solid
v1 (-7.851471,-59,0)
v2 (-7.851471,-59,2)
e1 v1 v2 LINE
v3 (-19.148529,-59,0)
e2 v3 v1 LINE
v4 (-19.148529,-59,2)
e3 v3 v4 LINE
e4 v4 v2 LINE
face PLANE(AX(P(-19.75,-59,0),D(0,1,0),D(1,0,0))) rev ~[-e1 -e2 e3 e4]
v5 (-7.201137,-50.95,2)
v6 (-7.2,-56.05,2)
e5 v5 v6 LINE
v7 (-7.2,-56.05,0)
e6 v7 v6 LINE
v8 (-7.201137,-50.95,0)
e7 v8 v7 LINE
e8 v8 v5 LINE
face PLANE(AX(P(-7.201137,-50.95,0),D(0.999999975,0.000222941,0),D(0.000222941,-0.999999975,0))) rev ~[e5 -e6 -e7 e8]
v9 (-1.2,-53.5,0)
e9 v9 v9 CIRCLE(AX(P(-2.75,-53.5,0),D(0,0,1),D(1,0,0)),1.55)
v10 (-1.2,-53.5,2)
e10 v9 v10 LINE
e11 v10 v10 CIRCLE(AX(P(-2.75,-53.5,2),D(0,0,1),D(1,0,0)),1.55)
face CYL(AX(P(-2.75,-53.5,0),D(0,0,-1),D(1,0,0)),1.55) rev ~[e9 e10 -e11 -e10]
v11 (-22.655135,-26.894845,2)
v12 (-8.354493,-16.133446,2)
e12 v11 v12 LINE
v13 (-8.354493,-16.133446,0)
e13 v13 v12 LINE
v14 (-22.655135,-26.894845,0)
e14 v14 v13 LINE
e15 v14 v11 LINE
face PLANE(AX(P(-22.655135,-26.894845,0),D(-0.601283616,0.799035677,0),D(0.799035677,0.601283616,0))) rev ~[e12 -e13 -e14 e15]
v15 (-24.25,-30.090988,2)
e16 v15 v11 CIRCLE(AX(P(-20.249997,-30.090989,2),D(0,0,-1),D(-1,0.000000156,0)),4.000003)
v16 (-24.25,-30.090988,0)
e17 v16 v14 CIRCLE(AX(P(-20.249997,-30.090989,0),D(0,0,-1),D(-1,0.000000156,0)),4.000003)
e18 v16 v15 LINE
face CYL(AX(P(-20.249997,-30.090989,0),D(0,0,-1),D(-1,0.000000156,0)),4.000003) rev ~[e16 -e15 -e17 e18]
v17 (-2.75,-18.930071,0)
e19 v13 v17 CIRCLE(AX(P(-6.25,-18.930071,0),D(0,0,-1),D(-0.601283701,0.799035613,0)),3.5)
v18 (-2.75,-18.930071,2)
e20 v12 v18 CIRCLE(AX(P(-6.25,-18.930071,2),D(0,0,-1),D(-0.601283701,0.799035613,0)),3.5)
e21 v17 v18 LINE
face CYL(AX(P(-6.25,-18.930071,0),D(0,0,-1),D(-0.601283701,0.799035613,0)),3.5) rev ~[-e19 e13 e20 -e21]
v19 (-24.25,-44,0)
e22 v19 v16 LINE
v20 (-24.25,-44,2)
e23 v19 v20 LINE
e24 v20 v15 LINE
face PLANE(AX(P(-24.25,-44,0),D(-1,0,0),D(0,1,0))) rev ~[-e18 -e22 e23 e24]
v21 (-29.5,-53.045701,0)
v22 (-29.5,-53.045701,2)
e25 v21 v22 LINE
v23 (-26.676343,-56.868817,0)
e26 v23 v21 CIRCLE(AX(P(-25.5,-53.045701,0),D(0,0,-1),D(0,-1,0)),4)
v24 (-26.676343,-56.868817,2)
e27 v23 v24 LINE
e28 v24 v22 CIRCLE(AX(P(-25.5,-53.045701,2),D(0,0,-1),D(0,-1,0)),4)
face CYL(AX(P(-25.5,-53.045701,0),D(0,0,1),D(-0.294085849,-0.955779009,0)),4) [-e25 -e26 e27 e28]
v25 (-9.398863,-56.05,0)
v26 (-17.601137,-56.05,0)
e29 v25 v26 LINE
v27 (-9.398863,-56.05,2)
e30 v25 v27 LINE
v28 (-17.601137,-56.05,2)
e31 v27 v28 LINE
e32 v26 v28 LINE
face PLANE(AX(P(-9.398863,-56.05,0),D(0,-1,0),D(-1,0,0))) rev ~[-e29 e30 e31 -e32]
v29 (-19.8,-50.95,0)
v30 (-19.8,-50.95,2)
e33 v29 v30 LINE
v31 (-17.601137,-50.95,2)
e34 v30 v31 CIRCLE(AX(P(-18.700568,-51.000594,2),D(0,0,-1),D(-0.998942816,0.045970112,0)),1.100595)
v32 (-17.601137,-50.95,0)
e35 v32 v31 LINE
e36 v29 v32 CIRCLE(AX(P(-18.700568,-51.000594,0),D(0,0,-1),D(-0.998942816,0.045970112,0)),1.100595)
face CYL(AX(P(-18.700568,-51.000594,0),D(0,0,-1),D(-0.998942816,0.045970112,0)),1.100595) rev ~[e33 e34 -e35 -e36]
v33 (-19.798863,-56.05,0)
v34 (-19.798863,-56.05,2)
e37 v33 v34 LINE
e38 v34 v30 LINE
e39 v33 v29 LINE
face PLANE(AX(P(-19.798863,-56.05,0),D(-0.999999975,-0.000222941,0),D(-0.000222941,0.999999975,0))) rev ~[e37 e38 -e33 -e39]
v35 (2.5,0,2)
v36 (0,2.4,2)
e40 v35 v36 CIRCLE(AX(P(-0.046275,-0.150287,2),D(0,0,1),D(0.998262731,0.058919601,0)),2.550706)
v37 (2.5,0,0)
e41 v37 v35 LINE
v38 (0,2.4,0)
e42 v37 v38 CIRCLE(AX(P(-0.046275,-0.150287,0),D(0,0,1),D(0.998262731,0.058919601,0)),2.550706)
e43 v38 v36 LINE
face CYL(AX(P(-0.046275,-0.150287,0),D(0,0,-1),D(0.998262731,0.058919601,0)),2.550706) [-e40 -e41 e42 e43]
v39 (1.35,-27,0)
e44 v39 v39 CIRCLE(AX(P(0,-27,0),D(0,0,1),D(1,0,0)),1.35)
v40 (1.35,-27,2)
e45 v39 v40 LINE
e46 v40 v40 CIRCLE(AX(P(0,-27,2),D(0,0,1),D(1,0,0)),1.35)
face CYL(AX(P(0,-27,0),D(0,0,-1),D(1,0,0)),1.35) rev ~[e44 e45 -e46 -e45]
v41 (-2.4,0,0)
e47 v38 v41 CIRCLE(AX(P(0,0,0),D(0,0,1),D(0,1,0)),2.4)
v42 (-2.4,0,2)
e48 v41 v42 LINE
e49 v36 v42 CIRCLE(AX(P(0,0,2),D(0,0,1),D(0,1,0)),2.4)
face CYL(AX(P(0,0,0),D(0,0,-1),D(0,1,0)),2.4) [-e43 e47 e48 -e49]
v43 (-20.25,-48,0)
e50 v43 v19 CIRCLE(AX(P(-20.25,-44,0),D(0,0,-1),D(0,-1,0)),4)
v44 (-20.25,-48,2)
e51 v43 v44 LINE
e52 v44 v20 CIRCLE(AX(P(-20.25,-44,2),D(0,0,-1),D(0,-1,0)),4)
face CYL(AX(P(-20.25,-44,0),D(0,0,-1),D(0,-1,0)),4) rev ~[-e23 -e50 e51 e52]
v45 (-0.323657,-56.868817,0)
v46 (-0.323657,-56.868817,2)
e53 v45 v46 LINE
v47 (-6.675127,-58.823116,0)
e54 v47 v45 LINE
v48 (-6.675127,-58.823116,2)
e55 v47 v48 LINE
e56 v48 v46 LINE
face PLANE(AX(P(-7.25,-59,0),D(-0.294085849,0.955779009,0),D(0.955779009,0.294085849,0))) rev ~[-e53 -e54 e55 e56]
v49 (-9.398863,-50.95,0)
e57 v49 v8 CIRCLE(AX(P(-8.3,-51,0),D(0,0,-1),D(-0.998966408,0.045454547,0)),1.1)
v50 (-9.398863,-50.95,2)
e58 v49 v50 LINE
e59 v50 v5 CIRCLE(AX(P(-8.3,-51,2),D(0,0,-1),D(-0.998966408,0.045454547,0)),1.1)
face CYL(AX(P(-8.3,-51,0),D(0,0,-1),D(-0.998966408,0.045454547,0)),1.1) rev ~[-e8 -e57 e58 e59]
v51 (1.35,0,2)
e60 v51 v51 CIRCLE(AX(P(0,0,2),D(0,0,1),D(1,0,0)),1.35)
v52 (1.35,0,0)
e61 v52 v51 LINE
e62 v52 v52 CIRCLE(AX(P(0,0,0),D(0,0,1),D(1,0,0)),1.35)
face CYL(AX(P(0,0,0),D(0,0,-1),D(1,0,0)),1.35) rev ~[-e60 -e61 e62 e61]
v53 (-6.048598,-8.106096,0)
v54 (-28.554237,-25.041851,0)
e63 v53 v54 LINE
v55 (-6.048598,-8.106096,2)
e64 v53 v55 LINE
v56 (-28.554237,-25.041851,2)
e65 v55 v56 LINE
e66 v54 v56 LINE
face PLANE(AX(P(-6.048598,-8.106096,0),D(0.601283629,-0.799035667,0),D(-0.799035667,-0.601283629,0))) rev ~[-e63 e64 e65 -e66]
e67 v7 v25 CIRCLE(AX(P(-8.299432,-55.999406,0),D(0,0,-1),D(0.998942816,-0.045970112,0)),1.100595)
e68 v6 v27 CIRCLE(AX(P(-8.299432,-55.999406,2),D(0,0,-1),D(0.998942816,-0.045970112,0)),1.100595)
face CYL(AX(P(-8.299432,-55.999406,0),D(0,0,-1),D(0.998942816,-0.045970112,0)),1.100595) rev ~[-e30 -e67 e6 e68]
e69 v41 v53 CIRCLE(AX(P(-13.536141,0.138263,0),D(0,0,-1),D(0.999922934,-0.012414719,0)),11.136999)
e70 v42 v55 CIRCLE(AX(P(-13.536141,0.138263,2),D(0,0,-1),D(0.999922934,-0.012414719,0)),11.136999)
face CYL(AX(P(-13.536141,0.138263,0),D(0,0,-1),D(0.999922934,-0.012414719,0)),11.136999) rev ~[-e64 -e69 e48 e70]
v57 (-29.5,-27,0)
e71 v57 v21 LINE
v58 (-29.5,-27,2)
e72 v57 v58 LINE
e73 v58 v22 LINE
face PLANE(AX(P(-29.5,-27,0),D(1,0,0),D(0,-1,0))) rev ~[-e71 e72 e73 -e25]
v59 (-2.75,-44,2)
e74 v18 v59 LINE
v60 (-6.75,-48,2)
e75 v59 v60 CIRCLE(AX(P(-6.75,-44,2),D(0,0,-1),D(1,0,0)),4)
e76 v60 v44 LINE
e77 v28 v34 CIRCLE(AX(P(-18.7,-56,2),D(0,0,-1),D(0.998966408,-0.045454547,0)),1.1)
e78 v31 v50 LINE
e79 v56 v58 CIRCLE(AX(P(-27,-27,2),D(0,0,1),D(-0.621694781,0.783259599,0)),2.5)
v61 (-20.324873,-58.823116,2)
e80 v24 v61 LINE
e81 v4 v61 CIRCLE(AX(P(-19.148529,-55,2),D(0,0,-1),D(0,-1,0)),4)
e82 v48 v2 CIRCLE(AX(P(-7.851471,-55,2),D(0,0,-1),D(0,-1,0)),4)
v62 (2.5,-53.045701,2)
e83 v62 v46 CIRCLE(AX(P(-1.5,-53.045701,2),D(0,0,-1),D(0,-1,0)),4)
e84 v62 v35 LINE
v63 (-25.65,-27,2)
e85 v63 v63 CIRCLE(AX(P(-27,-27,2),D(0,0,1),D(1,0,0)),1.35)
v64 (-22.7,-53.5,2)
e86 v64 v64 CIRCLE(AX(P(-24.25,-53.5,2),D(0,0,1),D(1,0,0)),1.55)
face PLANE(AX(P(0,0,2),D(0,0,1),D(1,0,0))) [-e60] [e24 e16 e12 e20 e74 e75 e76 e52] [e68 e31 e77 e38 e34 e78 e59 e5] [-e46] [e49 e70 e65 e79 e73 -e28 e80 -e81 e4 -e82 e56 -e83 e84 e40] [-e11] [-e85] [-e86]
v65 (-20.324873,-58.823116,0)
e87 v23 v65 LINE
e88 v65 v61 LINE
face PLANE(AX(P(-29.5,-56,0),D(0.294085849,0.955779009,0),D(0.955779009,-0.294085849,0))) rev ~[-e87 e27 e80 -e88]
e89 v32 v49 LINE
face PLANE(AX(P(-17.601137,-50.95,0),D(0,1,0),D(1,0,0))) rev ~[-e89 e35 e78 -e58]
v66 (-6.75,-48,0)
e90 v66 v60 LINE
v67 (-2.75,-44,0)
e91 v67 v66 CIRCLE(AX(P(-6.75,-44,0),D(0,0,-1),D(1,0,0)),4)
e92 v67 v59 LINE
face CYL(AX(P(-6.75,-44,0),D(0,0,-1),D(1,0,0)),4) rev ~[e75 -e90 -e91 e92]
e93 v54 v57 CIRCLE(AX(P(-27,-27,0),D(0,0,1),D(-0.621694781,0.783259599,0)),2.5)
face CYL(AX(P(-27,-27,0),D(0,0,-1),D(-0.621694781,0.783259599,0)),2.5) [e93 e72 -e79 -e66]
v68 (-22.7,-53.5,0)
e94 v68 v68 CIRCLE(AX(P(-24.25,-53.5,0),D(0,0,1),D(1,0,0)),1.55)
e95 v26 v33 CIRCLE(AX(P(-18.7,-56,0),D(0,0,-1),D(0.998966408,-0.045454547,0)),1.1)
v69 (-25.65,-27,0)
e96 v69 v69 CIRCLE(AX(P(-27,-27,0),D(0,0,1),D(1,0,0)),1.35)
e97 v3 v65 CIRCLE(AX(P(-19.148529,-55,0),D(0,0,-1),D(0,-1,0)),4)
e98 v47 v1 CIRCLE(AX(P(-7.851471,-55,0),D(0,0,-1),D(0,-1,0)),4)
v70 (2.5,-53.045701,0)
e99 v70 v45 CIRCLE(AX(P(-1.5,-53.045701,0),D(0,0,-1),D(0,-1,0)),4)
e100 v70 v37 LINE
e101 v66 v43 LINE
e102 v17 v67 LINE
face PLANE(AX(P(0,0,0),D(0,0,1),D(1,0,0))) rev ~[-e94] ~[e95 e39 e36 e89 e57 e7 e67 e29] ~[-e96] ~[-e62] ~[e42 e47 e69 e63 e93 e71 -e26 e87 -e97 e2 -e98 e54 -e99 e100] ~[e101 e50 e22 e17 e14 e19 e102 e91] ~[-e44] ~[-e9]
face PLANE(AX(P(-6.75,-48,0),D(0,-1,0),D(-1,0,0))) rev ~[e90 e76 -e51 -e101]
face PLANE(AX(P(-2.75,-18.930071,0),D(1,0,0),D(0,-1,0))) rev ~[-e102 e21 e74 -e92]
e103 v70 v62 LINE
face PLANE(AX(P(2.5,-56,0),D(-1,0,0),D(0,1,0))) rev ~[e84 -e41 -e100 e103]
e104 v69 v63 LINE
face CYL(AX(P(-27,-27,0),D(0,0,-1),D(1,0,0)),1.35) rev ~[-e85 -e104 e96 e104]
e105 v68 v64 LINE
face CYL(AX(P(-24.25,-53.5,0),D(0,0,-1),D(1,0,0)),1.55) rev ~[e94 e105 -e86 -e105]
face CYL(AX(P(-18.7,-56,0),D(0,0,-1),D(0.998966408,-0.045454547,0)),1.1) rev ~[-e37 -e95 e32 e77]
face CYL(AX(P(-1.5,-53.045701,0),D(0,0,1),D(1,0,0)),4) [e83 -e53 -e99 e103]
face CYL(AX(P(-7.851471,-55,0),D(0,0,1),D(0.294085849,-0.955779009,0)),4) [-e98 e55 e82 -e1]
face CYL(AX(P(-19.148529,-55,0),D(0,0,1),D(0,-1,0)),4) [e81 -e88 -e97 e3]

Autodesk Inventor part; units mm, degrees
ref_plane "YZ Plane" through (0, 0, 0) normal (1, 0, 0) x (0, 1, 0)
ref_plane "XZ Plane" through (0, 0, 0) normal (0, 1, 0) x (-1, 0, 0)
ref_plane "XY Plane" through (0, 0, 0) normal (0, 0, 1) x (1, 0, 0)
sketch "スケッチ2" plane through (0, 0, 0) normal (0, 0, 1) x (1, 0, 0)
  circle A0 centre (0, 0) radius 1.35
  line L0 (2.5, 0) -> (2.5, -56)
  circle A1 centre (0, 0) radius 2.4
  arc A2 (2.5, 0) -> (0, 2.4) centre (-0.046276, -0.150287) ccw
  arc A3 (0, 2.4) -> (-2.4, 0) centre (0, 0) ccw
  circle A4 centre (0, -27) radius 1.35
  circle A5 centre (-27, -27) radius 1.35
  line L1 (-7.25, -59) -> (2.5, -56)
  line L2 (-19.75, -56) -> (-19.75, -59)
  line L3 (-19.75, -59) -> (-29.5, -56)
  line L4 (-19.75, -59) -> (-7.25, -59)
  line L5 (-29.5, -56) -> (-29.5, -27)
  circle A6 centre (-8.3, -56) radius 1.05
  circle A7 centre (-8.3, -51) radius 1.05
  circle A8 centre (-18.7, -51) radius 1.05
  circle A9 centre (-18.7, -56) radius 1.05
  circle A10 centre (-2.75, -53.5) radius 1.55
  circle A11 centre (-24.25, -53.5) radius 1.55
  line L6 (-6.75, -48) -> (-20.25, -48)
  line L7 (-29.5, -27) -> (-27, -27)
  line L8 (-27, -27) -> (-28.554237, -25.041851)
  circle A12 centre (-27, -27) radius 2.5
  line L9 (-24.25, -44) -> (-24.25, -30.090988)
  line L10 (-2.75, -44) -> (-2.75, -18.930071)
  line L11 (-8.354493, -16.133446) -> (-22.655135, -26.894845)
  arc A13 (-28.554237, -25.041851) -> (-29.5, -27) centre (-27, -27) ccw
  line L12 (-28.554237, -25.041851) -> (-6.048598, -8.106096)
  arc A14 (-6.048598, -8.106096) -> (-2.4, 0) centre (-13.536142, 0.138263) ccw
  line L13 (-7.25, -56) -> (-7.25, -59)
  line L14 (-19.75, -56) -> (-7.25, -56)
  line L15 (-7.25, -56) -> (-7.25, -51)
  line L16 (-7.25, -51) -> (-19.75, -51)
  line L17 (-19.75, -51) -> (-19.75, -56)
  line L18 (-19.8, -50.95) -> (-7.2, -50.95)
  line L19 (-7.2, -50.95) -> (-7.2, -56.05)
  line L20 (-7.2, -56.05) -> (-19.8, -56.05)
  line L21 (-19.8, -56.05) -> (-19.8, -50.95)
  circle A15 centre (-18.7, -51) radius 1.1
  circle A16 centre (-8.3, -51) radius 1.1
  circle A17 centre (-18.7, -56) radius 1.1
  circle A18 centre (-8.3, -56) radius 1.1
  line L22 (2.5, -56) -> (-29.5, -56)
  circle A19 centre (-16, 1) radius 10.5
  arc A20 (-22.655135, -26.894845) -> (-24.25, -30.090988) centre (-20.25, -30.090988) ccw
  arc A21 (-24.25, -44) -> (-20.25, -48) centre (-20.25, -44) ccw
  arc A22 (-6.75, -48) -> (-2.75, -44) centre (-6.75, -44) ccw
  arc A23 (-2.75, -18.930071) -> (-8.354493, -16.133446) centre (-6.25, -18.930071) ccw
  point P0 (-2.75, -48)
  point P1 (-24.25, -48)
  point P2 (-24.25, -28.095)
  point P3 (-2.75, -11.916)
  point P4 (-19.798863, -50.95)
  point P5 (-17.601137, -50.95)
  point P6 (-9.398863, -50.95)
  point P7 (-7.201137, -50.95)
  point P8 (-7.201137, -56.05)
  point P9 (-9.398863, -56.05)
  point P10 (-17.601137, -56.05)
  point P11 (-19.798863, -56.05)
  dimension "d0" = 2.7
  dimension "d1" = 56
  dimension "d2" = 32
  dimension "d3" = 4.8
  dimension "d6" = 2.7
  dimension "d7" = 2.7
  dimension "d10" = 29
  dimension "d11" = 5
  dimension "d13" = 3.1
  dimension "d14" = 2.5
  dimension "d15" = 51.56
  dimension "d18" = 28.166
  dimension "d23" = 0.05
  dimension "d25" = 0.05
  dimension "d27" = 0.05
  dimension "d29" = 0.05
  dimension "d34" = 21
  dimension "d35" = 4
  dimension "d36" = 3.5
sketch "スケッチ2 outline for 押し出し2" plane through (0, 0, 0) normal (0, 0, 1) x (1, 0, 0)
  line L0 (-29.5, -27) -> (-29.5, -56)
  arc A0 (-28.554237, -25.041851) -> (-29.5, -27) centre (-27, -27) ccw
  line L1 (-29.5, -56) -> (-19.75, -59)
  line L2 (-6.048598, -8.106096) -> (-28.554237, -25.041851)
  line L3 (-19.75, -59) -> (-7.25, -59)
  arc A1 (-2.4, 0) -> (-6.048598, -8.106096) centre (-13.536142, 0.138263) cw
  line L4 (-7.25, -59) -> (2.5, -56)
  arc A2 (0, 2.4) -> (-2.4, 0) centre (0, 0) ccw
  line L5 (2.5, -56) -> (2.5, 0)
  arc A3 (2.5, 0) -> (0, 2.4) centre (-0.046276, -0.150287) ccw
  circle A4 centre (-24.25, -53.5) radius 1.55
  line L6 (-6.75, -48) -> (-20.25, -48)
  arc A5 (-2.75, -44) -> (-6.75, -48) centre (-6.75, -44) cw
  line L7 (-2.75, -18.930071) -> (-2.75, -44)
  arc A6 (-8.354493, -16.133446) -> (-2.75, -18.930071) centre (-6.25, -18.930071) cw
  line L8 (-22.655135, -26.894845) -> (-8.354493, -16.133446)
  arc A7 (-24.25, -30.090988) -> (-22.655135, -26.894845) centre (-20.25, -30.090988) cw
  line L9 (-24.25, -44) -> (-24.25, -30.090988)
  arc A8 (-20.25, -48) -> (-24.25, -44) centre (-20.25, -44) cw
  line L10 (-19.798863, -56.05) -> (-19.8, -50.95)
  arc A9 (-17.601137, -56.05) -> (-19.798863, -56.05) centre (-18.7, -56) cw
  line L11 (-9.398863, -56.05) -> (-17.601137, -56.05)
  arc A10 (-7.2, -56.05) -> (-9.398863, -56.05) centre (-8.299432, -55.999405) cw
  line L12 (-7.201137, -50.95) -> (-7.2, -56.05)
  arc A11 (-9.398863, -50.95) -> (-7.201137, -50.95) centre (-8.3, -51) cw
  line L13 (-17.601137, -50.95) -> (-9.398863, -50.95)
  arc A12 (-19.8, -50.95) -> (-17.601137, -50.95) centre (-18.700568, -51.000595) cw
  circle A13 centre (-2.75, -53.5) radius 1.55
  circle A14 centre (-27, -27) radius 1.35
  circle A15 centre (0, -27) radius 1.35
  circle A16 centre (0, 0) radius 1.35
extrude "押し出し2" add sketch "スケッチ2 outline for 押し出し2" along normal blind 2
fillet "フィレット3" radius 4 4 edges at (-29.5, -56, 1) (-19.75, -59, 1) (-7.25, -59, 1) (2.5, -56, 1)
properties part number "UpperArm_vertical_frame_01"
